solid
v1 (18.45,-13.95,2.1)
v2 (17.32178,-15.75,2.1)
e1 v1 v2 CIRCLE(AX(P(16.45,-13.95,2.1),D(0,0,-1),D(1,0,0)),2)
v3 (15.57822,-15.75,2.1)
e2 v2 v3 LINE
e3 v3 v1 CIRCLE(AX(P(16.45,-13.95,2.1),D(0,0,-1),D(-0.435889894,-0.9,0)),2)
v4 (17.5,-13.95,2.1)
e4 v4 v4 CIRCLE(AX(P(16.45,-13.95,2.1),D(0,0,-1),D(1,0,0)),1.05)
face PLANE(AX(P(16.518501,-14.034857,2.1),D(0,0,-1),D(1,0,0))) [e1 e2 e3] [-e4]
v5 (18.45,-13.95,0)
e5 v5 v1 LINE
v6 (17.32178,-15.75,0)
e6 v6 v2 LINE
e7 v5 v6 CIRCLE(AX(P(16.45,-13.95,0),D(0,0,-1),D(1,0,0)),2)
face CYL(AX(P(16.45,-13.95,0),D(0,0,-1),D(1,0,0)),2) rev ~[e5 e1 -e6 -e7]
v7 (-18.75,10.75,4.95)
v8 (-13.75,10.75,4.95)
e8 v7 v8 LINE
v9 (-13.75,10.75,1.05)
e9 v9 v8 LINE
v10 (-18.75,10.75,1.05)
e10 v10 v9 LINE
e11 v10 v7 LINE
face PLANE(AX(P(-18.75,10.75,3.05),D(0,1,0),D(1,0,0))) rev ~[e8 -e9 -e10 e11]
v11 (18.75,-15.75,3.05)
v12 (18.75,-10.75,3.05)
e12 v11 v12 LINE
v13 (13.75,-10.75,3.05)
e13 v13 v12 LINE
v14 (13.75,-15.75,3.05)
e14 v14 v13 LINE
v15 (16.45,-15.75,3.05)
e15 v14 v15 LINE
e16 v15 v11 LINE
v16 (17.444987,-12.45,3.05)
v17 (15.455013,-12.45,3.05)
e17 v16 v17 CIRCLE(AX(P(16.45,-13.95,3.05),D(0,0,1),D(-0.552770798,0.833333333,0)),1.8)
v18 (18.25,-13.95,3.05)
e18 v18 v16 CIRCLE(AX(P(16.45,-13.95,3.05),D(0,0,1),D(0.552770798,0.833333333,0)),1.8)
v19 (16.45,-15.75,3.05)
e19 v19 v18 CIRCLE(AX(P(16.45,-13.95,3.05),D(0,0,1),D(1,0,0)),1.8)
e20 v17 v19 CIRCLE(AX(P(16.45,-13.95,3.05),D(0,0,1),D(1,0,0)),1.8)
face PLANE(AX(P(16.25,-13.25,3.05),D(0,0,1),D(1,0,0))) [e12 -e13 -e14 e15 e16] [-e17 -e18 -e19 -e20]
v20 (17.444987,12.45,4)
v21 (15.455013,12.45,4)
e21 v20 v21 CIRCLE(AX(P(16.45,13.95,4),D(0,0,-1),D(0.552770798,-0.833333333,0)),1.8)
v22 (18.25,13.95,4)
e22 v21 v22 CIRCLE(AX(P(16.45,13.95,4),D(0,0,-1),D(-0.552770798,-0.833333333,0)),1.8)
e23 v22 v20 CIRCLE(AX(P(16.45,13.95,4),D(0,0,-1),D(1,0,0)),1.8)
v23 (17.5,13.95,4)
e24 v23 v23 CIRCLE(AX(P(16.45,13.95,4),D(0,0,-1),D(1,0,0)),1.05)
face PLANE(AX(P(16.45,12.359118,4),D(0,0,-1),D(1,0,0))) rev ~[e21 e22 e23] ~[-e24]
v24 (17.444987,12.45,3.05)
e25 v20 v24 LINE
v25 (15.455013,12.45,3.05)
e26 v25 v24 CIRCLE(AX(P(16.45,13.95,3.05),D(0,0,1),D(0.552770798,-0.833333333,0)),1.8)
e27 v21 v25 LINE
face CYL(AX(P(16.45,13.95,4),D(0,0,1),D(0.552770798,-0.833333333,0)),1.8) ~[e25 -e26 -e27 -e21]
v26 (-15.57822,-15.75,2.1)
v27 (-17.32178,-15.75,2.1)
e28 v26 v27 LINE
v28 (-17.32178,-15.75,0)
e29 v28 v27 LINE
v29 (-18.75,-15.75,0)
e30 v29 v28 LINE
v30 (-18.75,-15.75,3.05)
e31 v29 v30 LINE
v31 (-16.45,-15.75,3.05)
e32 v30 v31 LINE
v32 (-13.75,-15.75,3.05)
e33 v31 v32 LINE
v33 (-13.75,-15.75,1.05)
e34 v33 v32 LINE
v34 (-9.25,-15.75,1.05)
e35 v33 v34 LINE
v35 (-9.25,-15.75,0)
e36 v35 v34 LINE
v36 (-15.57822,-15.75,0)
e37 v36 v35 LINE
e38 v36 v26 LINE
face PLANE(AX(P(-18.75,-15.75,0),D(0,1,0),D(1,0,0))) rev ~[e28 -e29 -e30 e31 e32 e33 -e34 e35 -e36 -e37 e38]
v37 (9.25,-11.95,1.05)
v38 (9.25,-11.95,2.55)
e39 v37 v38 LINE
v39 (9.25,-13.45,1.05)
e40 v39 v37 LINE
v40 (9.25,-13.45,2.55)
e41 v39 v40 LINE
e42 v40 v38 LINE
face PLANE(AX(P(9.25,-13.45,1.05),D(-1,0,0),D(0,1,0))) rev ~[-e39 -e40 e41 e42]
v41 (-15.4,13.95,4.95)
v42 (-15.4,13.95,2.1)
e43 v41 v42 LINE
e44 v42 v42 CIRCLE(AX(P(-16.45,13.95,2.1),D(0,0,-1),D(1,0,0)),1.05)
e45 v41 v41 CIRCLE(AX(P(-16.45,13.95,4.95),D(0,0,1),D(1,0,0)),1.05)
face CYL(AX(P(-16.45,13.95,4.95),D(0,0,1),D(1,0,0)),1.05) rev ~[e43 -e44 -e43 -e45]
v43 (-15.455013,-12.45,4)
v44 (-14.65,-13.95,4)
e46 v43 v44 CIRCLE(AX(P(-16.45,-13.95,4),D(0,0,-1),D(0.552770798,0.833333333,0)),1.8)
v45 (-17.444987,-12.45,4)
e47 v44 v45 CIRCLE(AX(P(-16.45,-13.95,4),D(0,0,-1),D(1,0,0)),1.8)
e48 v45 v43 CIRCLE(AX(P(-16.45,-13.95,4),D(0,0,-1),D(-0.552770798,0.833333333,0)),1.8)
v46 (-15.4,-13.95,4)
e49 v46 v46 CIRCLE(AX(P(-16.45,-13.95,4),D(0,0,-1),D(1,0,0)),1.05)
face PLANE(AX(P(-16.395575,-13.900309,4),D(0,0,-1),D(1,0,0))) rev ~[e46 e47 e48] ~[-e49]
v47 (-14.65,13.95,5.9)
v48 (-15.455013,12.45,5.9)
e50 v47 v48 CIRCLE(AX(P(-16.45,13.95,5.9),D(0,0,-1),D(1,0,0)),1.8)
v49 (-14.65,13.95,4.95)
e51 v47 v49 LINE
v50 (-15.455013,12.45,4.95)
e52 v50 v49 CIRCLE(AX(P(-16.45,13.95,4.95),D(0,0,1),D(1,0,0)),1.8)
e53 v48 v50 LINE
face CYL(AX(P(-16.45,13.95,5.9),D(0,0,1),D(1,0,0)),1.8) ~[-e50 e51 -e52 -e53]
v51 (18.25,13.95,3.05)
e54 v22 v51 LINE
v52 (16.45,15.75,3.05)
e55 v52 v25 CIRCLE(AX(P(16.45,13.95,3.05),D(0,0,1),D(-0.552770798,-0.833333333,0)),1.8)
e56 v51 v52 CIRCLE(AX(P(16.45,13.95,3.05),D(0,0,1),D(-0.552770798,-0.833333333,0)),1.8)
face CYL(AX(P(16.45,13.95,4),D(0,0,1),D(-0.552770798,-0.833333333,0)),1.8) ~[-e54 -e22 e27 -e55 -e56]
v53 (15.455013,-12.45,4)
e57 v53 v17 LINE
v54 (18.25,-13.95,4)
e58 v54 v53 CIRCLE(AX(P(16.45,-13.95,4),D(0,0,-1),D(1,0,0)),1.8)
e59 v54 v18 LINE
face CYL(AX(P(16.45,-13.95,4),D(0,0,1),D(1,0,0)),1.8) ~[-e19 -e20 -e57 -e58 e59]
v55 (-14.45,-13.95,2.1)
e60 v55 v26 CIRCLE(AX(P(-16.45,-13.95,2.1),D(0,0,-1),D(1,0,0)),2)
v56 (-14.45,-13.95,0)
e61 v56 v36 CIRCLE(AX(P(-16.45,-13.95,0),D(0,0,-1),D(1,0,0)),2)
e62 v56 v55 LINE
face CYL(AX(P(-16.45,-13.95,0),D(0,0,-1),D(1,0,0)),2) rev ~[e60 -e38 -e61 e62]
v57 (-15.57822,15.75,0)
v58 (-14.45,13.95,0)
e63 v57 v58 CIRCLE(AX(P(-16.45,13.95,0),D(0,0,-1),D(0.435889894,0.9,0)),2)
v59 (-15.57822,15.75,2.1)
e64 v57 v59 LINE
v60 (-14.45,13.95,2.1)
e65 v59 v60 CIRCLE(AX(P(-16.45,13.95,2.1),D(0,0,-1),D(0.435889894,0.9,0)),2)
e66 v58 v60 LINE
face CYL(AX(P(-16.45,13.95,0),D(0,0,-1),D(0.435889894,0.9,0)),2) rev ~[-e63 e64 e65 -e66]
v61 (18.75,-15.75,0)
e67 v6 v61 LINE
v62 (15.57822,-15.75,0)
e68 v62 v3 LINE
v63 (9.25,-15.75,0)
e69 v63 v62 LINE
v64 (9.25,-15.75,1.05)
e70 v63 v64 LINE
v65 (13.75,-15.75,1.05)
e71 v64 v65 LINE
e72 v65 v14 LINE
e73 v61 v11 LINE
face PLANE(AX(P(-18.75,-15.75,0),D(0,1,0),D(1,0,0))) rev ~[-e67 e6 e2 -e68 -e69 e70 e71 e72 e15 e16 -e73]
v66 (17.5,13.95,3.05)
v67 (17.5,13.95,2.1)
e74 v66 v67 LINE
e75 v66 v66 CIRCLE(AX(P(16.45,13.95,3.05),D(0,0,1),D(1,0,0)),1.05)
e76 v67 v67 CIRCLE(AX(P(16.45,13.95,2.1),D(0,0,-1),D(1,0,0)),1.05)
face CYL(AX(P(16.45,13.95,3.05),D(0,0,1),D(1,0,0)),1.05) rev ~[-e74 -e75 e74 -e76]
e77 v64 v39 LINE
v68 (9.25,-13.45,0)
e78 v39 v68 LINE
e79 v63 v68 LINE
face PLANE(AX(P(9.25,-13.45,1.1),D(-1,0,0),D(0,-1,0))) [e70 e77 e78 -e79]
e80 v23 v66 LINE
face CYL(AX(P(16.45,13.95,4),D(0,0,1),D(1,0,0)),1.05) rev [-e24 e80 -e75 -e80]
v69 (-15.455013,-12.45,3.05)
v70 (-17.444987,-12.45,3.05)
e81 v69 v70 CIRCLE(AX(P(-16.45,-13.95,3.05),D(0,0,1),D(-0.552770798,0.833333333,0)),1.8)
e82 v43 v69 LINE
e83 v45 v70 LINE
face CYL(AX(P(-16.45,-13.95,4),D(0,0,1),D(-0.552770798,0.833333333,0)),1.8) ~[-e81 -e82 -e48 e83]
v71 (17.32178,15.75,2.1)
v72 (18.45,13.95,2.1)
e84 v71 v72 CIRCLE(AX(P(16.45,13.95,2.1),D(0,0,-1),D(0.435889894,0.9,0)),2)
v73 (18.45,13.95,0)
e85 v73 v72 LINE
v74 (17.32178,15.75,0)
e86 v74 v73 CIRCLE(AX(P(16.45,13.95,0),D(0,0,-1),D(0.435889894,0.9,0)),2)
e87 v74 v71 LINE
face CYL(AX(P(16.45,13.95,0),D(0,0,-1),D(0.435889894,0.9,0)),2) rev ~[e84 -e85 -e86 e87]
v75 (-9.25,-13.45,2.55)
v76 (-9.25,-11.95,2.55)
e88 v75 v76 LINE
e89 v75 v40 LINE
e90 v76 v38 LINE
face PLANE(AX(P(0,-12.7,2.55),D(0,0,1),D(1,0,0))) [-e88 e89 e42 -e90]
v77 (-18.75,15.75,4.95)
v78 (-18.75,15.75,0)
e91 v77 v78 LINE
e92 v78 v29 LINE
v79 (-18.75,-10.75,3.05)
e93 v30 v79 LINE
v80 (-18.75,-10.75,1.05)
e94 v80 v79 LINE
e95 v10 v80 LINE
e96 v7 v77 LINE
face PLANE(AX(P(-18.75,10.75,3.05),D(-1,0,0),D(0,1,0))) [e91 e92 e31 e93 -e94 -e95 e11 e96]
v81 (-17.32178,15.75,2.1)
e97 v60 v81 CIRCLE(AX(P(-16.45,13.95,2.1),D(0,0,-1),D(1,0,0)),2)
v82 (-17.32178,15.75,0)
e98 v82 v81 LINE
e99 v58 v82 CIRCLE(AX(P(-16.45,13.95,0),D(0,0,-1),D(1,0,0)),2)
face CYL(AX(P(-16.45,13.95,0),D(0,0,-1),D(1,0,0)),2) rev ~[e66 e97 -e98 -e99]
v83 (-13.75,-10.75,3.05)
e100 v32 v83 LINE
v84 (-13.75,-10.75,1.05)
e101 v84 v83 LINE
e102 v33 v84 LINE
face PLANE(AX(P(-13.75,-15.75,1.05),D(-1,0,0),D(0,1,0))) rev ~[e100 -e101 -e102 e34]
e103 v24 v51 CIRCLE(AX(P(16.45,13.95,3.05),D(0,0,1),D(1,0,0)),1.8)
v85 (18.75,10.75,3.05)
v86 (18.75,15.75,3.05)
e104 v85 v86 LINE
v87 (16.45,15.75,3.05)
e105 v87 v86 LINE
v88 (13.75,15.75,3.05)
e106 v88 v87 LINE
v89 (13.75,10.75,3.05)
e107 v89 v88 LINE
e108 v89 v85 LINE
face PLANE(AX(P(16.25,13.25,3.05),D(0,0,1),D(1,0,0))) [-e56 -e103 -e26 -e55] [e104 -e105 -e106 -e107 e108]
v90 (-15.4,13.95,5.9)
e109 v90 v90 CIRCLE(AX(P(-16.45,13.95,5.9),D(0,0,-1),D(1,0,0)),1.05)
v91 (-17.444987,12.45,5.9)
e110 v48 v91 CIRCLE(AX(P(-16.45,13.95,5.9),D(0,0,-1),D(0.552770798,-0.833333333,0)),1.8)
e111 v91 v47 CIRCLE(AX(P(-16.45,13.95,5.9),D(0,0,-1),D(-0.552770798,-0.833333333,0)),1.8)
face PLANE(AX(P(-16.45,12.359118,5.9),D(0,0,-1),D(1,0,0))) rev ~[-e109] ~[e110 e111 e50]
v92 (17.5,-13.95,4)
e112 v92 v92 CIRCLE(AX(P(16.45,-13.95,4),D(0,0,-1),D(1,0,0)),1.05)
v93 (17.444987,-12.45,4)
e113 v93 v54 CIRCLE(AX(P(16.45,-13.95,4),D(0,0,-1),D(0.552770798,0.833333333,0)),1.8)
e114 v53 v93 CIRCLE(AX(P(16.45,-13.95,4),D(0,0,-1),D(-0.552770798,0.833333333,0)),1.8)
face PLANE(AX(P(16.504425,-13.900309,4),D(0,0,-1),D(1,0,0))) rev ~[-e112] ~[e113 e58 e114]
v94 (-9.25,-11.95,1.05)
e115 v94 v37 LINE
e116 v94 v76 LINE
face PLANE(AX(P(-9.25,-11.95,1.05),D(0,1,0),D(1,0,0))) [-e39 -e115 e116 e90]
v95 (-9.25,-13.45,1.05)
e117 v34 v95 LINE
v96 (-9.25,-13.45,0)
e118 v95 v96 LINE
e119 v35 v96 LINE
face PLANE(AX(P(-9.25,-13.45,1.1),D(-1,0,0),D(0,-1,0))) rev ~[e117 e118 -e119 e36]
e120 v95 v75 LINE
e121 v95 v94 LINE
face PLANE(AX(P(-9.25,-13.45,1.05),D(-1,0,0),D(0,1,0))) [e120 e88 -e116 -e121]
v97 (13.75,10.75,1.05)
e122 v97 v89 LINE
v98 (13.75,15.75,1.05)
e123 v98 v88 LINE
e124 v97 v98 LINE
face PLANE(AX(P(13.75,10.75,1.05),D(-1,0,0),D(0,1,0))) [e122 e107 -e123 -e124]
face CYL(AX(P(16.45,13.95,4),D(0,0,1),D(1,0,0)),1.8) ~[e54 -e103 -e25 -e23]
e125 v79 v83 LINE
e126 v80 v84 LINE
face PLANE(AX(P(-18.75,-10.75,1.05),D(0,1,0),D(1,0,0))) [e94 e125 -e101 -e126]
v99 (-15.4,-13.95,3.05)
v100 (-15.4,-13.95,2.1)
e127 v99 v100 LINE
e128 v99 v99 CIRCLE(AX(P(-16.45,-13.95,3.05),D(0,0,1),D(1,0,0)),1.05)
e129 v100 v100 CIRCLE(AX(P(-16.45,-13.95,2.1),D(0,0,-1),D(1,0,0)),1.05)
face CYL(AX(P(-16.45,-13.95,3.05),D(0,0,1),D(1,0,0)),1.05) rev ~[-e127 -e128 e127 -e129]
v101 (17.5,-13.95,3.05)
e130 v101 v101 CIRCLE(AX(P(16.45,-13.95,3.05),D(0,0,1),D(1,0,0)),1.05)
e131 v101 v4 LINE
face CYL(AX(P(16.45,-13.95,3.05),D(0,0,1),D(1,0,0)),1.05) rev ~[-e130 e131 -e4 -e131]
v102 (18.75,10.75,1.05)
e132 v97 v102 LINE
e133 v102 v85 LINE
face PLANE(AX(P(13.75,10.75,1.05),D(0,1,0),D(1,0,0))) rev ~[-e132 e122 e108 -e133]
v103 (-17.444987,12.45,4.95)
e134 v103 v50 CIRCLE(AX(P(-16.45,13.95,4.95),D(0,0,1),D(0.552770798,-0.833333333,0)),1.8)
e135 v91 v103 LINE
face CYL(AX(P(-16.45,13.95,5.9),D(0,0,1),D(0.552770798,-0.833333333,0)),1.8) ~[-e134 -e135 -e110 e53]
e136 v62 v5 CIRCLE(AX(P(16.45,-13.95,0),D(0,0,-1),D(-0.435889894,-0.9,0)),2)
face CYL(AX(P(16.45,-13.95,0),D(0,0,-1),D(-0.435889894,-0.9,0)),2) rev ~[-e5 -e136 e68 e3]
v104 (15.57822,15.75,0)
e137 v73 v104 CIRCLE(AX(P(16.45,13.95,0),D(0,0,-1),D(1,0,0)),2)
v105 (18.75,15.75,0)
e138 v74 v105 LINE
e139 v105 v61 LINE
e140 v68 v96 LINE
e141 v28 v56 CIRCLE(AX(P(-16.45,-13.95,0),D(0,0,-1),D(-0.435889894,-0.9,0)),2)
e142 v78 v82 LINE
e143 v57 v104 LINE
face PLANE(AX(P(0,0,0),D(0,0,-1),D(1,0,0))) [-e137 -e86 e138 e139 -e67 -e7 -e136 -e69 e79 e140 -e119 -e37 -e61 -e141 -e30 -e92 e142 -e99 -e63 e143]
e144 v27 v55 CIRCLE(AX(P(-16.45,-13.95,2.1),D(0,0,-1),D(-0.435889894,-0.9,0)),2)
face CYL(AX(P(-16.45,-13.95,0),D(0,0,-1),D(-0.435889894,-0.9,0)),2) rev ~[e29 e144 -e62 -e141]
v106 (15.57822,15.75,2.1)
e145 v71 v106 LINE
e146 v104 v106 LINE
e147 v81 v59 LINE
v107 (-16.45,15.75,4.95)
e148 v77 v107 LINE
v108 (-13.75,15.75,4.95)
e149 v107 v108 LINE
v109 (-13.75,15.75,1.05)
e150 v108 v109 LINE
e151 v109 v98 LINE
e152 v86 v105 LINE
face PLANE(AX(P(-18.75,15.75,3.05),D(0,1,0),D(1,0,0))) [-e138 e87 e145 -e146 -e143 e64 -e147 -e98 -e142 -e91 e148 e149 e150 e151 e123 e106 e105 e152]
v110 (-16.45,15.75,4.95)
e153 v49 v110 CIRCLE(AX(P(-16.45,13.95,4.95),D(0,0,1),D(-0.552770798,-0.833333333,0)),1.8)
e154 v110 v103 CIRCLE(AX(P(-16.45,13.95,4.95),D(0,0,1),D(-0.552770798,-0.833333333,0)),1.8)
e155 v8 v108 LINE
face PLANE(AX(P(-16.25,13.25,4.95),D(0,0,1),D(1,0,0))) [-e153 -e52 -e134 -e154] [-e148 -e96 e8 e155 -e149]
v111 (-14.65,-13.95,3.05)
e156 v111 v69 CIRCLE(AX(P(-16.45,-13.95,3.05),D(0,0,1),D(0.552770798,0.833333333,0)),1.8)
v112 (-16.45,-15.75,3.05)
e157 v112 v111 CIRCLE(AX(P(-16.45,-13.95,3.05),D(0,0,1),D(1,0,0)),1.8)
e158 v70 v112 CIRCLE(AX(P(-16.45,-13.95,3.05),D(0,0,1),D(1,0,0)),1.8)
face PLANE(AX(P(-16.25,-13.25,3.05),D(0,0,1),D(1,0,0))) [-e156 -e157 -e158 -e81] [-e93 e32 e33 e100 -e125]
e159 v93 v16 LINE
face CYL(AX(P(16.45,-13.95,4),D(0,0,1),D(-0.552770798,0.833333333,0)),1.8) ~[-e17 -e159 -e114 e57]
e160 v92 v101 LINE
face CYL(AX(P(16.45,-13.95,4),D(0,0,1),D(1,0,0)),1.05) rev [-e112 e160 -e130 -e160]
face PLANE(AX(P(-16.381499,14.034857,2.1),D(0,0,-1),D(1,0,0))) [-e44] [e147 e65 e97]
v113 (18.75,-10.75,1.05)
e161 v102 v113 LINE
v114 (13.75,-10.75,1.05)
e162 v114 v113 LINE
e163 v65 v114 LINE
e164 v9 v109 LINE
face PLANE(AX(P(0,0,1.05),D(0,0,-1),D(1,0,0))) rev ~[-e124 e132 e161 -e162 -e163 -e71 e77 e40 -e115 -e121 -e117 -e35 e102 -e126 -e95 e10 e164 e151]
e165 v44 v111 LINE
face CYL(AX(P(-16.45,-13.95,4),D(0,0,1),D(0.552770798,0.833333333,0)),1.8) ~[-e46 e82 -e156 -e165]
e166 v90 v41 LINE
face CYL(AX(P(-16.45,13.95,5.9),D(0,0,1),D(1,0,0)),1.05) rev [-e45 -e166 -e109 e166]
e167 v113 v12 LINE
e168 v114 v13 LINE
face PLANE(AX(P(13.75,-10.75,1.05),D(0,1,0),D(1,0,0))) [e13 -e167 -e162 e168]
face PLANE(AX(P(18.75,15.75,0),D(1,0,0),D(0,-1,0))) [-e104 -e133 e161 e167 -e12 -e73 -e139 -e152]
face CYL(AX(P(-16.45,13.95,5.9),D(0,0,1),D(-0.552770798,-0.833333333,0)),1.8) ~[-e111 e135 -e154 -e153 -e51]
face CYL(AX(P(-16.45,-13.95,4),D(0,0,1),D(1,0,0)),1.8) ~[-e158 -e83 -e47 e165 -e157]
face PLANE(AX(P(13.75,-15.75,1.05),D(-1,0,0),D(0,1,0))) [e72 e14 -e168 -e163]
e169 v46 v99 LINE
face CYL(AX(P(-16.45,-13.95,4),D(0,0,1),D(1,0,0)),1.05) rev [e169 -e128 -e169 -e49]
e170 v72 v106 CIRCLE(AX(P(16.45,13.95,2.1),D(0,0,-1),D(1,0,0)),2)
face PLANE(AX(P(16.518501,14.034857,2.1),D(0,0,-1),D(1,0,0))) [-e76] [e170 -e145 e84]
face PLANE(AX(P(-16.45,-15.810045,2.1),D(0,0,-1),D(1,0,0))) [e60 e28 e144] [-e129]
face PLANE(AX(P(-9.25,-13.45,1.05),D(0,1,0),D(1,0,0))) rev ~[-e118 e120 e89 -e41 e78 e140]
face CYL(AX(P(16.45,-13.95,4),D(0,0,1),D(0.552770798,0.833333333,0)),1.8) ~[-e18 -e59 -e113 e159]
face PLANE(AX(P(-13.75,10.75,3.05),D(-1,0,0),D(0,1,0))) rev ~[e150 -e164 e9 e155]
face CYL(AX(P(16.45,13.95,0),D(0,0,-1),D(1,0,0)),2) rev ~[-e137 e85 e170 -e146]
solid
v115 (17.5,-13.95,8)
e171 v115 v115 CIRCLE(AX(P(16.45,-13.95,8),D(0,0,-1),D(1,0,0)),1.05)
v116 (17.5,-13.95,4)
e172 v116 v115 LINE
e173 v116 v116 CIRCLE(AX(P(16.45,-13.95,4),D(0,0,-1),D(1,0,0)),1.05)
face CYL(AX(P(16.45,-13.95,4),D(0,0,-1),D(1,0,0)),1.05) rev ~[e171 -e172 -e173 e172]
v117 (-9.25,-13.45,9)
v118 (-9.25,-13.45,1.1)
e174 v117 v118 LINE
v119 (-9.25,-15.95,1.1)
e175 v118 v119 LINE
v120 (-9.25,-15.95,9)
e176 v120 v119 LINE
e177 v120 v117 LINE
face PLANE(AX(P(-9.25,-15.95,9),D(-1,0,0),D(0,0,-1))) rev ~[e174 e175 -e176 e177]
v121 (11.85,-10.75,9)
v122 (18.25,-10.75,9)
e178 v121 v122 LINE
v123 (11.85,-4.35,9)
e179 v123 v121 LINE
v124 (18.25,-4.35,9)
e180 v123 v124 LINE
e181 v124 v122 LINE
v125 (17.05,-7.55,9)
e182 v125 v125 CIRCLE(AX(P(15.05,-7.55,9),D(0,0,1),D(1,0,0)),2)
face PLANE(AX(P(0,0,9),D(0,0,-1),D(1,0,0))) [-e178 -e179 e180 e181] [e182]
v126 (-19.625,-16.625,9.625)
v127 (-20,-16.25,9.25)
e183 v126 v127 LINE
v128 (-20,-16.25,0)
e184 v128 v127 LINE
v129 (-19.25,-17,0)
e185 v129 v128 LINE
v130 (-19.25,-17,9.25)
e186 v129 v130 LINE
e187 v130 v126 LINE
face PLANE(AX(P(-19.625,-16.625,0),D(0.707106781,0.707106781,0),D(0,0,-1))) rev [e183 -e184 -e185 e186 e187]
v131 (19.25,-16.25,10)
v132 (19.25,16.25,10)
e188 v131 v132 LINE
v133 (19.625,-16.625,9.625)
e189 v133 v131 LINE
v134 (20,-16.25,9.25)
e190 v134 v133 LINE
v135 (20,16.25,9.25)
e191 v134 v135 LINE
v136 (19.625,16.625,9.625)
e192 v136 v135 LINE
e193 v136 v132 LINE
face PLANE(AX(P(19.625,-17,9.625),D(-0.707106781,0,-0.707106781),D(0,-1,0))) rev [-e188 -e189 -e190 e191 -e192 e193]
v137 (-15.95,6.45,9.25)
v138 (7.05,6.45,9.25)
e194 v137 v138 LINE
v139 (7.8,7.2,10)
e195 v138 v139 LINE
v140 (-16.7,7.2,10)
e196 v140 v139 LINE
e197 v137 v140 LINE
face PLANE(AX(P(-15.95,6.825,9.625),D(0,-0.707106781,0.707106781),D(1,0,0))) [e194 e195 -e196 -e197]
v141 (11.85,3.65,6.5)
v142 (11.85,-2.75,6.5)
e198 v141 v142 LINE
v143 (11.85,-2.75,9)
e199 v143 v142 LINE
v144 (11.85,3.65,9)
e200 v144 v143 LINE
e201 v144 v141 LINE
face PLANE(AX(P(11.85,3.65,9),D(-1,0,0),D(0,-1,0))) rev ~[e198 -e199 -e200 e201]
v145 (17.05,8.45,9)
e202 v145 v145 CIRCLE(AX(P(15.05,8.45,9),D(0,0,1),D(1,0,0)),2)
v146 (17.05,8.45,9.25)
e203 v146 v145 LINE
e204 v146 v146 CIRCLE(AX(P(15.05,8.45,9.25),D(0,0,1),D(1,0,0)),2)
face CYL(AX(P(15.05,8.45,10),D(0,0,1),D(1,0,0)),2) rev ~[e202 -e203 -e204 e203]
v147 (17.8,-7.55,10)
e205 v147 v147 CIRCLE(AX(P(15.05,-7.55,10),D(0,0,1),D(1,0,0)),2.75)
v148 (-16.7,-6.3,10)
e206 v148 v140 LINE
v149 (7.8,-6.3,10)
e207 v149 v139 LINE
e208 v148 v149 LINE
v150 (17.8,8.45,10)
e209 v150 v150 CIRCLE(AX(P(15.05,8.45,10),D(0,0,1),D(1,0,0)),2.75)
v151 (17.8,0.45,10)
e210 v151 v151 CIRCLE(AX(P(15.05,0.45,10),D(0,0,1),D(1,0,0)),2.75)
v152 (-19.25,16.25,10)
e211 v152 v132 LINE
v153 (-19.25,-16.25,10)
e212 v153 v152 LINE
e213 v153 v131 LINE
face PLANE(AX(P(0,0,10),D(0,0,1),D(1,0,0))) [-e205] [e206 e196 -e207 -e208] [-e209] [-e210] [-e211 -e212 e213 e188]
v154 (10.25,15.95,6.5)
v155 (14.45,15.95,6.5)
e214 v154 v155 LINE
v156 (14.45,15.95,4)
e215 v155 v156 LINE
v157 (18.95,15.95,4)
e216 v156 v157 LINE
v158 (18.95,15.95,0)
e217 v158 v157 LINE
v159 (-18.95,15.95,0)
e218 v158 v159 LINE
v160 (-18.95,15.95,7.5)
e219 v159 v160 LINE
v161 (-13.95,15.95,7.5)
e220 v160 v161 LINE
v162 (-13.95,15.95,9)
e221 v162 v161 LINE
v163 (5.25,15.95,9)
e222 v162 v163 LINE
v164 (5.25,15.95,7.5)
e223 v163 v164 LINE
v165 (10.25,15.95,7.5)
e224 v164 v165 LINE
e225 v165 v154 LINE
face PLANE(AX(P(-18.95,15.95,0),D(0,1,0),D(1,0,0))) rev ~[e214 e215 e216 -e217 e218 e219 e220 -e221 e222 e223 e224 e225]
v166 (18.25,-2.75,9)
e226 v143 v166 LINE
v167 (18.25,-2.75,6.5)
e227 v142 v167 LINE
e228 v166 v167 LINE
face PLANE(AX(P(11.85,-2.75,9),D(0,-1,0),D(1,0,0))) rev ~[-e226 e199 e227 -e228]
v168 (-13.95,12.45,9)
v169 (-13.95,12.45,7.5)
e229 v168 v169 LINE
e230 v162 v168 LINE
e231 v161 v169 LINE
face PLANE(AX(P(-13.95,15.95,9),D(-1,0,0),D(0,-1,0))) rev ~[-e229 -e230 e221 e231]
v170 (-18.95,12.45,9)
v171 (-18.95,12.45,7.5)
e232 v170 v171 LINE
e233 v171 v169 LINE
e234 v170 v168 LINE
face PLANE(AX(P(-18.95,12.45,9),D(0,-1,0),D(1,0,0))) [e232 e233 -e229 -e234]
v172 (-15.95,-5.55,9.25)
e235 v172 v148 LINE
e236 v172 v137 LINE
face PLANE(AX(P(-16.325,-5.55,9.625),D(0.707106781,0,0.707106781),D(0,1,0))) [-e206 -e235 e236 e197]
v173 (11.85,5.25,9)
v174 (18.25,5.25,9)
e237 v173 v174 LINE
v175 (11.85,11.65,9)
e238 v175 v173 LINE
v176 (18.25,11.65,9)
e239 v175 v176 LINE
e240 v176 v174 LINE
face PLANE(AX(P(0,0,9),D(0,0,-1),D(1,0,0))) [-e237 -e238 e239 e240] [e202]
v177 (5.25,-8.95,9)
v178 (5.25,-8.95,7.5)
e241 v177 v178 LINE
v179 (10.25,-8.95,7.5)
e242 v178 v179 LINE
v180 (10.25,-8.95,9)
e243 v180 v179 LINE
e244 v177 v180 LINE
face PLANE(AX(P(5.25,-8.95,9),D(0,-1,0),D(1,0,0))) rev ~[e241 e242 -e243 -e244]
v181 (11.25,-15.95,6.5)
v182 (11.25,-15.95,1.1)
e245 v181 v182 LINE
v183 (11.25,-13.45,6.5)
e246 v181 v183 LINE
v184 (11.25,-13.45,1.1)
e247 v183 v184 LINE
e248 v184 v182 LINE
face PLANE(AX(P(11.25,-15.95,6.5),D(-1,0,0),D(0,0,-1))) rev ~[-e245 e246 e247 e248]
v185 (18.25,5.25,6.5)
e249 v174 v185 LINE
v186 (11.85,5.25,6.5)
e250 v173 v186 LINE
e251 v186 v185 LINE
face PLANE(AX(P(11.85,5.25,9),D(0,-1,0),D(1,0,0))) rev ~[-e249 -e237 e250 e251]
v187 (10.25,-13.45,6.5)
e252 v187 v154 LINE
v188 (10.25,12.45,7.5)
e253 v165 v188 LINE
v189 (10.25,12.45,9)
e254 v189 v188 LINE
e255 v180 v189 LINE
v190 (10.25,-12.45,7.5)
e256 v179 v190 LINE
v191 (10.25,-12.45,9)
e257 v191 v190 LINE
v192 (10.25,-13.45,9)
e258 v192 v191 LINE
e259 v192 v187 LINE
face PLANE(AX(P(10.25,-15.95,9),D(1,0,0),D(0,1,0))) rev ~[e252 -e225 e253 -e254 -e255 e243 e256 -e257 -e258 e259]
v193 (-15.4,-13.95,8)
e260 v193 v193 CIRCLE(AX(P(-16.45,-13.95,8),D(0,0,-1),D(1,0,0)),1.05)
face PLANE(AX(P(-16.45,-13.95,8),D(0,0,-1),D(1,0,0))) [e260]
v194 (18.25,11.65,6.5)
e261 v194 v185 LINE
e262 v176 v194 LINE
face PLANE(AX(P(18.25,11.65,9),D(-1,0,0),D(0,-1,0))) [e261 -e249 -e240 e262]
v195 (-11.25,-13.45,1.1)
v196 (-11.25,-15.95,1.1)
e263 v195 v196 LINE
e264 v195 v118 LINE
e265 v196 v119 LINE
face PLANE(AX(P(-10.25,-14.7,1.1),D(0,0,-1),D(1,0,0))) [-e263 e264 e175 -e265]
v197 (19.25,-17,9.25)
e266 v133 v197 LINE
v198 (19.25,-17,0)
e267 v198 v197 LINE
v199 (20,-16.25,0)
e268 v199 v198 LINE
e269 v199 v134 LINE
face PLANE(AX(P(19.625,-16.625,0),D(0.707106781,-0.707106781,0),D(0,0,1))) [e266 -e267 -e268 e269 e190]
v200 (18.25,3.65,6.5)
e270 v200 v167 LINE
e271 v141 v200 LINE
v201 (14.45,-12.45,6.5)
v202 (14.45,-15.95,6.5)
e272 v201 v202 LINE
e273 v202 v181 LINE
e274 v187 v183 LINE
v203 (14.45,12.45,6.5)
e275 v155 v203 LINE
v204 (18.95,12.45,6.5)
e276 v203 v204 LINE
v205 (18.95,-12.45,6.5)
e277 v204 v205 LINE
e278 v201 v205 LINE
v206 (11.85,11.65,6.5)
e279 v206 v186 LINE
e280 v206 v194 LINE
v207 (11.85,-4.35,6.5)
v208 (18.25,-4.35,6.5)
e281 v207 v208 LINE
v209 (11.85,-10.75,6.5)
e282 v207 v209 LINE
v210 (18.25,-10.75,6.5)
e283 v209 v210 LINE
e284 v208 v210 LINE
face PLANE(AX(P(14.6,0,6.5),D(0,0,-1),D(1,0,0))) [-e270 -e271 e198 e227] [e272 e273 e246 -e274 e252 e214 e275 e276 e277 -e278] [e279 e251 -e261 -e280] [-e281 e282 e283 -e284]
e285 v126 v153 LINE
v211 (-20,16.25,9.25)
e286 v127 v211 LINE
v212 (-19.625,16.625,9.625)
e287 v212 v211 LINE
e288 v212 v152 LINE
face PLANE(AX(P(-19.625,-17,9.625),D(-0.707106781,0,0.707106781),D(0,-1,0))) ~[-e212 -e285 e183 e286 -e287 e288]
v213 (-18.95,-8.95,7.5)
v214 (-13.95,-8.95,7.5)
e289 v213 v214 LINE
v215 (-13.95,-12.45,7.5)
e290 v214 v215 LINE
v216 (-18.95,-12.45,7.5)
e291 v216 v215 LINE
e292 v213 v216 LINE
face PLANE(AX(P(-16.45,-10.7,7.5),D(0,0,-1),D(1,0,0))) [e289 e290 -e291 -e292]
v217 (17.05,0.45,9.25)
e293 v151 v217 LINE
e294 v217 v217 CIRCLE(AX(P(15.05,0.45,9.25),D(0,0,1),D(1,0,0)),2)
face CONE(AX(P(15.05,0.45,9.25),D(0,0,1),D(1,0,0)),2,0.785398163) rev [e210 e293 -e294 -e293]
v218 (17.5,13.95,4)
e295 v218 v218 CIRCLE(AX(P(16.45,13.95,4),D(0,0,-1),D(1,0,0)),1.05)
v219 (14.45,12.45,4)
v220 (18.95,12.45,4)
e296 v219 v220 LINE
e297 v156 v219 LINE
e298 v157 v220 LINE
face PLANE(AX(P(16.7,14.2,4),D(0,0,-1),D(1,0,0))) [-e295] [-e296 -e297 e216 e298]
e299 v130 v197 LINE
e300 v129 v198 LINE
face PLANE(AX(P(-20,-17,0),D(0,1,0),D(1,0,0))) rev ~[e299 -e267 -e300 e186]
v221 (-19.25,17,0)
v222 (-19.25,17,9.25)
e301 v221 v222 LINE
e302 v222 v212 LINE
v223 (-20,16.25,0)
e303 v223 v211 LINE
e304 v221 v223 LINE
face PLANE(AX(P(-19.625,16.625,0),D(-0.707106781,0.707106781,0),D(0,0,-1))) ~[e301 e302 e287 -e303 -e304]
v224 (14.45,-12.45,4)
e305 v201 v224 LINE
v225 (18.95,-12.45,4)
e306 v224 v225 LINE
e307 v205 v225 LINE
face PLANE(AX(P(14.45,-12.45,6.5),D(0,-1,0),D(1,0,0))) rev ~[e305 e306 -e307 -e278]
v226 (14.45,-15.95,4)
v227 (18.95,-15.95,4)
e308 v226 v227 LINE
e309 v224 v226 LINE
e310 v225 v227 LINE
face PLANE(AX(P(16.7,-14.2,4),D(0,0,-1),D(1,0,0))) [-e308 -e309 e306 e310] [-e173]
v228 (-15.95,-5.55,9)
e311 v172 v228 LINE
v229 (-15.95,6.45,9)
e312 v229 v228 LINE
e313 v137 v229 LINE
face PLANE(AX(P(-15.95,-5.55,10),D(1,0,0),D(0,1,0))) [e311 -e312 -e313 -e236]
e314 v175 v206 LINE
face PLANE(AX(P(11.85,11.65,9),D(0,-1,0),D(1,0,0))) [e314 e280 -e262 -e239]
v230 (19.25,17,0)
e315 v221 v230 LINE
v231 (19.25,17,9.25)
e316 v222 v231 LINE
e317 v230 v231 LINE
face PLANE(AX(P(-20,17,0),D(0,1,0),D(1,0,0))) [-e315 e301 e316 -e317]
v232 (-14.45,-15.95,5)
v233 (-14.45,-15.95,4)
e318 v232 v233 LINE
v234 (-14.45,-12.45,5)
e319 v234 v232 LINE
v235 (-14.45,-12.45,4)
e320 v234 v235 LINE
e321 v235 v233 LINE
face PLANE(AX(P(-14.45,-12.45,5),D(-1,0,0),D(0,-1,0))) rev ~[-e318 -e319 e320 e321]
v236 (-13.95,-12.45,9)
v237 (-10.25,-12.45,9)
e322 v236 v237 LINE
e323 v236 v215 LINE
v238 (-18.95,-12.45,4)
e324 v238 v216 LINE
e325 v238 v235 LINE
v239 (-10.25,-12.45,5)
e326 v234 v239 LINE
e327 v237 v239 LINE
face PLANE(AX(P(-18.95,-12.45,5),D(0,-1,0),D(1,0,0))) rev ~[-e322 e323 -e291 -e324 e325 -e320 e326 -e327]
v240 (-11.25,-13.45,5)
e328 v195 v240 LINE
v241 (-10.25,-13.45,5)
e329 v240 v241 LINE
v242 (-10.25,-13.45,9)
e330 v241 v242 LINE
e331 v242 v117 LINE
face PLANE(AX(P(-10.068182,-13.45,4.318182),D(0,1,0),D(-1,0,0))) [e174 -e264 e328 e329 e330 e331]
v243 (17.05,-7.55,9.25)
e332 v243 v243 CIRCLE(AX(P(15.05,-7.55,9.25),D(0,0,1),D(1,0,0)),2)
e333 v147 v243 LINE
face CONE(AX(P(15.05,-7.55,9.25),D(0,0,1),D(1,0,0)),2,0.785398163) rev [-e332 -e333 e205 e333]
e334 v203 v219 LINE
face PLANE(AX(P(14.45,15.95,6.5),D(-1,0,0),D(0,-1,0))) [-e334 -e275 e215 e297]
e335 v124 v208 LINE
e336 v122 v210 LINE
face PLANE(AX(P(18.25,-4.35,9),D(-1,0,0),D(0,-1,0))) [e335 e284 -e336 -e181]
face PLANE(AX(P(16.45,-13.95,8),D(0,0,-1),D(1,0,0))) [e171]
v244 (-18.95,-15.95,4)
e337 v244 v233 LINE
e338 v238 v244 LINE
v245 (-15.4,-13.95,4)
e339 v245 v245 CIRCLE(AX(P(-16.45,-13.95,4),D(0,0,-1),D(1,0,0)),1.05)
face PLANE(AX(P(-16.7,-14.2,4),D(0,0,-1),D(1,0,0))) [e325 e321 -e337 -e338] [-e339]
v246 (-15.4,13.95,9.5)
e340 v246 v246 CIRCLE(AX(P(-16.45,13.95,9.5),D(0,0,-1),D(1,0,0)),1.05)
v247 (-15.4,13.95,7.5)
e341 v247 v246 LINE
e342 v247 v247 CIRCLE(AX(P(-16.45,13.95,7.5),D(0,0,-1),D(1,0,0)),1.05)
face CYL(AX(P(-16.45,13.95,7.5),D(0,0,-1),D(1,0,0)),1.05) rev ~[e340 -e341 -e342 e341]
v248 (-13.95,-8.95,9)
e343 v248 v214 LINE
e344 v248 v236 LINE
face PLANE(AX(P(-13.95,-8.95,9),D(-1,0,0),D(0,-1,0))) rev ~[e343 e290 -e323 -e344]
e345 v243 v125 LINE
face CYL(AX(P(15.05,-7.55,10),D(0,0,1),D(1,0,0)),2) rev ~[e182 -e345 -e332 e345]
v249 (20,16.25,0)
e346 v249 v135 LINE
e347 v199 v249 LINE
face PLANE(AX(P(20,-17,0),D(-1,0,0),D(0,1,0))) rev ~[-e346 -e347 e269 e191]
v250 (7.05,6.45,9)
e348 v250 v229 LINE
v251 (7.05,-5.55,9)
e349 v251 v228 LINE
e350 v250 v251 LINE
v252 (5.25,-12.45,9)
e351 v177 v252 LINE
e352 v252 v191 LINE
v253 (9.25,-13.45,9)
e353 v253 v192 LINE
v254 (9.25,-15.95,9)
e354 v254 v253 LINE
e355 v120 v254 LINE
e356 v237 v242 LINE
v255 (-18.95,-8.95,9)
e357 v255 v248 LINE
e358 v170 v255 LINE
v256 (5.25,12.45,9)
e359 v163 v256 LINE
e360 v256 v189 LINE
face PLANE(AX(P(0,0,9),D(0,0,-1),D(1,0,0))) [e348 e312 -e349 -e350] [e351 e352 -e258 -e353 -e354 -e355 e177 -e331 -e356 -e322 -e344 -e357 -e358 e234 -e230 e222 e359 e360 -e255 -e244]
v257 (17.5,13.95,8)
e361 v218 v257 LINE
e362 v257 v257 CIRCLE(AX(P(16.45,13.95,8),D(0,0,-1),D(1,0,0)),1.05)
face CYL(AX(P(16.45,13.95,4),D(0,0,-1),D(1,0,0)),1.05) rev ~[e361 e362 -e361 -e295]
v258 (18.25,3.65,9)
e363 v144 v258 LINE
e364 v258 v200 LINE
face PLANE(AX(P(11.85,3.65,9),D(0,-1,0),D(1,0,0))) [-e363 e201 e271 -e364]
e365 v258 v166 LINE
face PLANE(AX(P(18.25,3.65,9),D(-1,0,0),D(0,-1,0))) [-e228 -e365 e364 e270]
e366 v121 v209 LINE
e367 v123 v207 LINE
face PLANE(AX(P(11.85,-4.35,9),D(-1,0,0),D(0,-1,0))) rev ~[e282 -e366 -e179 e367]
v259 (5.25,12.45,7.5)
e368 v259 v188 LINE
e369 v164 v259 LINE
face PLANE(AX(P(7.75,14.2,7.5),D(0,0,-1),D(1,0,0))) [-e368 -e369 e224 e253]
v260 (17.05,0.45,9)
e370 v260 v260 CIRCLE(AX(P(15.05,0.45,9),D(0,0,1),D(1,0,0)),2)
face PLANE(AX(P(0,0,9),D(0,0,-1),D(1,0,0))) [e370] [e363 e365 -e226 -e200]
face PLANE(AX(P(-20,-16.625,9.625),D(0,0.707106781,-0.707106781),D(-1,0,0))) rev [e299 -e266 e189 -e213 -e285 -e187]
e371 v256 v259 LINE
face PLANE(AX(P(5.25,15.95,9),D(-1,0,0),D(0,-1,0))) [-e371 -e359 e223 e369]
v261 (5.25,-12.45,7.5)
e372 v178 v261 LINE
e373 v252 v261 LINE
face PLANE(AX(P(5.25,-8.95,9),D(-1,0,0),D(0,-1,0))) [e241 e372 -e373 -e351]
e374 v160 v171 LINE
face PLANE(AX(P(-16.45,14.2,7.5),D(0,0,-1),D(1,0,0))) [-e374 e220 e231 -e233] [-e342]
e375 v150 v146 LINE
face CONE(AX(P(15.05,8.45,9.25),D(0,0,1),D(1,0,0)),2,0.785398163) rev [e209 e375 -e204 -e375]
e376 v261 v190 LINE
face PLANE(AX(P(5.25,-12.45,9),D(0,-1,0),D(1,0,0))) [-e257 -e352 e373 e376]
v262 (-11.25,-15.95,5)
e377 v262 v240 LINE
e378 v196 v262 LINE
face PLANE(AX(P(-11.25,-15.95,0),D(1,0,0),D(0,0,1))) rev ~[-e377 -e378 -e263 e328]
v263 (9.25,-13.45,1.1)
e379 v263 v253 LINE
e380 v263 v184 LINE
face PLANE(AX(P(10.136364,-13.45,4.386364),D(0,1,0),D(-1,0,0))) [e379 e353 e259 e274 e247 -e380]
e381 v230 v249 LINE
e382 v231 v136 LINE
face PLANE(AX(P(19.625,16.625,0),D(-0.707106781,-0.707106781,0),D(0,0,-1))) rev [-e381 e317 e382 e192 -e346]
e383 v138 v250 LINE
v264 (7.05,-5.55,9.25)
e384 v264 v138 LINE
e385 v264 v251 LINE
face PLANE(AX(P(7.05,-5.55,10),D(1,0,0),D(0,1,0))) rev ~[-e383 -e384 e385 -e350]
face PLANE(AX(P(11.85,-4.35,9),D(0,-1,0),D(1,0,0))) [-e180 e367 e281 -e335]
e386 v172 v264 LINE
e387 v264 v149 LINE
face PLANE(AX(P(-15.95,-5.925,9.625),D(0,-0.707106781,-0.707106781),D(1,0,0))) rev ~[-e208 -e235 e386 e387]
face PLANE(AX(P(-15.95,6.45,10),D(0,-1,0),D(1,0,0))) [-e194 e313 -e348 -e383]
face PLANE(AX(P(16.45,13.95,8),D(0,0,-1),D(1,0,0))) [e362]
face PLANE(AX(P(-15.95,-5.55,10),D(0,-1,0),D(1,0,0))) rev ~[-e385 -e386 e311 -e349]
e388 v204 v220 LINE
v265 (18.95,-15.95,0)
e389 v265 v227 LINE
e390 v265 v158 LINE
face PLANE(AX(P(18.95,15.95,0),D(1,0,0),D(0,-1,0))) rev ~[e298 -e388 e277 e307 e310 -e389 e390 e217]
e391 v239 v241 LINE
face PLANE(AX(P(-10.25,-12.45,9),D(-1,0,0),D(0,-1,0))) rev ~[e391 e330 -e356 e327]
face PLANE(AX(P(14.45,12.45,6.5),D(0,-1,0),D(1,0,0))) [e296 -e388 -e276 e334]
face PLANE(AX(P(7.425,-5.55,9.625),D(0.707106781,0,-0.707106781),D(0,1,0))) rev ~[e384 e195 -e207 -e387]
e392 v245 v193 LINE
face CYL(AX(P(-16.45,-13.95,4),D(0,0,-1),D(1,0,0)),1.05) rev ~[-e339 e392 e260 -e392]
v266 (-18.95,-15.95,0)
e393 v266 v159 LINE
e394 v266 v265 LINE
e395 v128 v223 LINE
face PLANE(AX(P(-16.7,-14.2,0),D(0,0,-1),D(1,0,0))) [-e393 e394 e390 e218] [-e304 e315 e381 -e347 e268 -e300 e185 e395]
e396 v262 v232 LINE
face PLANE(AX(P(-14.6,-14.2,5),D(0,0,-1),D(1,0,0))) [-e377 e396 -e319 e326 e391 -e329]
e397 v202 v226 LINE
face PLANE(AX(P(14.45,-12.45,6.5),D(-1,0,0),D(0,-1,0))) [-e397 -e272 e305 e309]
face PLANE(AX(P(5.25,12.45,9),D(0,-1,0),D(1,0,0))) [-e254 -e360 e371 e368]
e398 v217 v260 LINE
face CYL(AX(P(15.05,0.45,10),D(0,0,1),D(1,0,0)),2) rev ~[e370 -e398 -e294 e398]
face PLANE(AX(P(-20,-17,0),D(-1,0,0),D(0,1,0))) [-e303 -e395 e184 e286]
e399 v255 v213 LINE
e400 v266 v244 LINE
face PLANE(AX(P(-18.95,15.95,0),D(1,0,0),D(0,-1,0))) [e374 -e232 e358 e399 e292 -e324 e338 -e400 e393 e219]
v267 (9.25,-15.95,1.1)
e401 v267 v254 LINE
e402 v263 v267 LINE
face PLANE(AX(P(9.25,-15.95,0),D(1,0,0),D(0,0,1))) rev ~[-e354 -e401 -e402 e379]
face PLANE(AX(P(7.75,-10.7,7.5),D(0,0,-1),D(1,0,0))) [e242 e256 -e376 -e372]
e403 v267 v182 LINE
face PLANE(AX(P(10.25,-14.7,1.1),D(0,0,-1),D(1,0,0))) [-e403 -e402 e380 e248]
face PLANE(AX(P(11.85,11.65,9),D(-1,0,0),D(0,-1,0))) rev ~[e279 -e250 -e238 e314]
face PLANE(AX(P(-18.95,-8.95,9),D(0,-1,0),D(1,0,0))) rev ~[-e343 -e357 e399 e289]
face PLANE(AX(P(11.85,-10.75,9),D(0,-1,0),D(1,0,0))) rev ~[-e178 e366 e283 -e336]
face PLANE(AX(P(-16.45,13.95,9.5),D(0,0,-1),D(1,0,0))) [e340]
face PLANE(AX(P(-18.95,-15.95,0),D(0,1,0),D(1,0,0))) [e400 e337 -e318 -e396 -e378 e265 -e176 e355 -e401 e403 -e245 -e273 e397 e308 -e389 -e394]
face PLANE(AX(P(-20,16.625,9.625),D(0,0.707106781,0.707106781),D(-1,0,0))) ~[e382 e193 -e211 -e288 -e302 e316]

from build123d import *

# Parameters (mm, degrees)
F0_W      = 40
F0_H      = 34
F1_DEPTH  = 10
F2_W      = 37.9
F2_H      = 31.9
F3_DEPTH  = 9
F4_R      = 2
F4_W      = 23
F4_H      = 12
F5_DEPTH  = 25
F6_W      = 6.4
F6_H      = 6.4
F7_DEPTH  = 2.5
F6_W_2    = 5
F6_H_2    = 3.5
F8_DEPTH  = 1.5
F9_DEPTH  = 4
F10_R     = 1.05
F11_DEPTH = 2
F12_SIZE  = 0.75
F14_DEPTH = 2.5
F15_W     = 2
F15_H     = 2.5
F16_DEPTH = 1.1
F17_SIZE  = 0.75
F18_W     = 4.5
F18_H     = 3.5
F19_W     = 4.5
F19_H     = 3.5
F20_DEPTH = 5
F21_W     = 4.5
F21_H     = 3.5
F22_DEPTH = 4
F23_R     = 1.05
F24_R     = 1.05
F25_R     = 1.05
F26_DEPTH = 4
F27_W     = 37.5
F27_H     = 31.5
F28_DEPTH = 1.05
F29_W     = 18.5
F29_H     = 2.5
F30_DEPTH = 25
F32_R     = 1.05
F33_DEPTH = 2.95
F31_R     = 1.05
F34_DEPTH = 2.95
F35_R     = 1.05
F36_DEPTH = 2.95
F38_START = 1.6
F37_R     = 1.05
F38_DEPTH = 4.85
F39_W     = 5
F39_H     = 5
F40_DEPTH = 2
F41_W     = 5
F41_H     = 5
F42_DEPTH = 1.9
F43_DEPTH = 25
F44_R     = 1.05
F45_DEPTH = 2.1
F46_W     = 18.5
F46_H     = 1.5
F47_DEPTH = 1.5


with BuildPart() as f1:
    # F0 (on Top) → F1 (new body)
    with BuildSketch(Plane.XY):
        Rectangle(F0_W, F0_H)
    extrude(amount=F1_DEPTH)

    # F2 (on face) → F3 (cut)
    with BuildSketch(Plane(origin=(0, 0, 0), x_dir=(1, 0, 0), z_dir=(0, 0, -1))):
        Rectangle(F2_W, F2_H)
    extrude(amount=-F3_DEPTH, mode=Mode.SUBTRACT)

    # F4 (on face) → F5 (cut)
    with BuildSketch(Plane.XY.offset(10)):
        with Locations((15.05, -7.55)):
            Circle(F4_R)
        with Locations((15.05, 0.45)):
            Circle(F4_R)
        with Locations((15.05, 8.45)):
            Circle(F4_R)
        with Locations((-4.45, 0.45)):
            Rectangle(F4_W, F4_H)
    extrude(amount=-F5_DEPTH, mode=Mode.SUBTRACT)

    # F6 (on face) → F7 (join)
    with BuildSketch(Plane(origin=(0, 0, 9), x_dir=(1, 0, 0), z_dir=(0, 0, -1))):
        Polygon((18.95, 15.95), (10.25, 15.95), (10.25, 12.45), (10.25, 8.95), (10.25, -12.45), (10.25, -15.95), (18.95, -15.95), align=None)
        with Locations((15.05, -8.45)):
            Rectangle(F6_W, F6_H, mode=Mode.SUBTRACT)
        with Locations((15.05, -0.45)):
            Rectangle(F6_W, F6_H, mode=Mode.SUBTRACT)
        with Locations((15.05, 7.55)):
            Rectangle(F6_W, F6_H, mode=Mode.SUBTRACT)
    extrude(amount=F7_DEPTH)

    # F6 (on face) → F8 (join)
    with BuildSketch(Plane(origin=(0, 0, 9), x_dir=(1, 0, 0), z_dir=(0, 0, -1))):
        with Locations((-16.45, 10.7)):
            Rectangle(F6_W_2, F6_H_2)
        with Locations((7.75, 10.7)):
            Rectangle(F6_W_2, F6_H_2)
        with Locations((-16.45, -14.2)):
            Rectangle(F6_W_2, F6_H_2)
        with Locations((7.75, -14.2)):
            Rectangle(F6_W_2, F6_H_2)
    extrude(amount=F8_DEPTH)

    # F6 (on face) → F9 (join)
    with BuildSketch(Plane(origin=(0, 0, 9), x_dir=(1, 0, 0), z_dir=(0, 0, -1))):
        Polygon((-10.25, 12.45), (-10.25, 15.95), (-18.95, 15.95), (-18.95, 12.45), (-13.95, 12.45), align=None)
    extrude(amount=F9_DEPTH)

    # F10 (on face) → F11 (cut)
    with BuildSketch(Plane(origin=(0, 0, 7.5), x_dir=(1, 0, 0), z_dir=(0, 0, -1))):
        with Locations((-16.45, -13.95)):
            Circle(F10_R)
    extrude(amount=-F11_DEPTH, mode=Mode.SUBTRACT)

    # F12
    f12_edges = [f1.edges().sort_by_distance(p)[0] for p in [
        (-20, 0, 10),
        (0, 17, 10),
        (20, 0, 10),
        (0, -17, 10),
        (-4.45, 6.45, 10),
        (7.05, 0.45, 10),
        (-4.45, -5.55, 10),
        (-15.95, 0.45, 10),
        (13.05, 8.45, 10),
        (13.05, 0.45, 10),
        (13.05, -7.55, 10),
    ]]
    chamfer(f12_edges, length=F12_SIZE)

    # F13 (on face) → F14 (join)
    with BuildSketch(Plane(origin=(0, -15.95, 0), x_dir=(-1, 0, 0), z_dir=(0, 1, 0))):
        Polygon((9.25, 0), (11.25, 0), (11.25, 5), (10.25, 5), (10.25, 9), (9.25, 9), align=None)
        Polygon((-11.25, 0), (-9.25, 0), (-9.25, 9), (-10.25, 9), (-10.25, 6.5), (-11.25, 6.5), align=None)
    extrude(amount=F14_DEPTH)

    # F15 (on face) → F16 (cut)
    with BuildSketch(Plane(origin=(0, 0, 0), x_dir=(1, 0, 0), z_dir=(0, 0, -1))):
        with Locations((-10.25, 14.7)):
            Rectangle(F15_W, F15_H)
        with Locations((10.25, 14.7)):
            Rectangle(F15_W, F15_H)
    extrude(amount=-F16_DEPTH, mode=Mode.SUBTRACT)

    # F17
    f17_edges = [f1.edges().sort_by_distance(p)[0] for p in [
        (-20, 17, 4.625),
        (20, 17, 4.625),
        (-20, -17, 4.625),
        (20, -17, 4.625),
    ]]
    chamfer(f17_edges, length=F17_SIZE)

    # F18 (on face) + F19 (on face) → F20 (join, through all)
    with BuildSketch(Plane(origin=(0, 0, 5), x_dir=(1, 0, 0), z_dir=(0, 0, -1))):
        with Locations((-16.7, 14.2)):
            Rectangle(F18_W, F18_H)
    with BuildSketch(Plane(origin=(0, 0, 6.5), x_dir=(1, 0, 0), z_dir=(0, 0, -1))):
        with Locations((16.7, 14.2)):
            Rectangle(F19_W, F19_H)
        with Locations((16.7, -14.2)):
            Rectangle(F19_W, F19_H)
    extrude(amount=F20_DEPTH)

    # F21 (on face) → F22 (cut)
    with BuildSketch(Plane(origin=(0, 0, 0), x_dir=(1, 0, 0), z_dir=(0, 0, -1))):
        with Locations((-16.7, 14.2)):
            Rectangle(F21_W, F21_H)
        with Locations((16.7, 14.2)):
            Rectangle(F21_W, F21_H)
        with Locations((16.7, -14.2)):
            Rectangle(F21_W, F21_H)
    extrude(amount=-F22_DEPTH, mode=Mode.SUBTRACT)

    # F23 (on face) + F24 (on face) + F25 (on face) → F26 (cut)
    with BuildSketch(Plane(origin=(0, 0, 4), x_dir=(1, 0, 0), z_dir=(0, 0, -1))):
        with Locations((-16.45, 13.95)):
            Circle(F23_R)
    with BuildSketch(Plane(origin=(0, 0, 4), x_dir=(1, 0, 0), z_dir=(0, 0, -1))):
        with Locations((16.45, 13.95)):
            Circle(F24_R)
    with BuildSketch(Plane(origin=(0, 0, 4), x_dir=(1, 0, 0), z_dir=(0, 0, -1))):
        with Locations((16.45, -13.95)):
            Circle(F25_R)
    extrude(amount=-F26_DEPTH, mode=Mode.SUBTRACT)


with BuildPart() as f28:
    # F27 (on face) → F28 (new body)
    with BuildSketch(Plane(origin=(0, 0, 0), x_dir=(1, 0, 0), z_dir=(0, 0, -1))):
        Rectangle(F27_W, F27_H)
    extrude(amount=-F28_DEPTH)

    # F29 (on face) → F30 (cut)
    with BuildSketch(Plane(origin=(0, 0, 1.1), x_dir=(1, 0, 0), z_dir=(0, 0, -1))):
        with Locations((0, 14.7)):
            Rectangle(F29_W, F29_H)
    extrude(amount=F30_DEPTH, mode=Mode.SUBTRACT)

    # F32 (on face) → F33 (join, through all)
    with BuildSketch(Plane(origin=(0, 0, 4), x_dir=(1, 0, 0), z_dir=(0, 0, -1))):
        with BuildLine():
            ThreePointArc((17.4449874371, 12.45), (18.0360292221, 13.0988177007), (18.25, 13.95))
            ThreePointArc((18.25, 13.95), (15.5988177007, 15.5360292221), (15.4550125629, 12.45))
            Line((15.4550125629, 12.45), (17.4449874371, 12.45))
        make_face()
        with Locations((16.45, 13.95)):
            Circle(F32_R, mode=Mode.SUBTRACT)
        with BuildLine():
            Line((17.4449874371, 12.45), (15.4550125629, 12.45))
            ThreePointArc((15.4550125629, 12.45), (16.45, 12.15), (17.4449874371, 12.45))
        make_face()
    extrude(amount=F33_DEPTH)

    # F31 (on face) → F34 (join, through all)
    with BuildSketch(Plane(origin=(0, 0, 4), x_dir=(1, 0, 0), z_dir=(0, 0, -1))):
        with BuildLine():
            ThreePointArc((-15.4550125629, 12.45), (-14.8639707779, 13.0988177007), (-14.65, 13.95))
            ThreePointArc((-14.65, 13.95), (-17.3011822993, 15.5360292221), (-17.4449874371, 12.45))
            Line((-17.4449874371, 12.45), (-15.4550125629, 12.45))
        make_face()
        with Locations((-16.45, 13.95)):
            Circle(F31_R, mode=Mode.SUBTRACT)
        with BuildLine():
            Line((-15.4550125629, 12.45), (-17.4449874371, 12.45))
            ThreePointArc((-17.4449874371, 12.45), (-16.45, 12.15), (-15.4550125629, 12.45))
        make_face()
    extrude(amount=F34_DEPTH)

    # F35 (on face) → F36 (join, through all)
    with BuildSketch(Plane(origin=(0, 0, 4), x_dir=(1, 0, 0), z_dir=(0, 0, -1))):
        with BuildLine():
            Line((15.4550125629, -12.45), (17.4449874371, -12.45))
            ThreePointArc((17.4449874371, -12.45), (16.45, -12.15), (15.4550125629, -12.45))
        make_face()
        with BuildLine():
            ThreePointArc((15.4550125629, -12.45), (15.5988177007, -15.5360292221), (18.25, -13.95))
            ThreePointArc((18.25, -13.95), (18.0360292221, -13.0988177007), (17.4449874371, -12.45))
            Line((17.4449874371, -12.45), (15.4550125629, -12.45))
        make_face()
        with Locations((16.45, -13.95)):
            Circle(F35_R, mode=Mode.SUBTRACT)
    extrude(amount=F36_DEPTH)

    # F37 (on face) → F38 (join)
    with BuildSketch(Plane(origin=(0, 0, 7.5), x_dir=(1, 0, 0), z_dir=(0, 0, -1)).offset(F38_START)):
        with BuildLine():
            Line((-17.4449874371, -12.45), (-15.4550125629, -12.45))
            ThreePointArc((-15.4550125629, -12.45), (-16.45, -12.15), (-17.4449874371, -12.45))
        make_face()
        with BuildLine():
            ThreePointArc((-17.4449874371, -12.45), (-17.3011822993, -15.5360292221), (-14.65, -13.95))
            ThreePointArc((-14.65, -13.95), (-14.8639707779, -13.0988177007), (-15.4550125629, -12.45))
            Line((-15.4550125629, -12.45), (-17.4449874371, -12.45))
        make_face()
        with Locations((-16.45, -13.95)):
            Circle(F37_R, mode=Mode.SUBTRACT)
    extrude(amount=F38_DEPTH)

    # F39 (on face) → F40 (join)
    with BuildSketch(Plane.XY.offset(1.05)):
        with Locations((-16.25, 13.25)):
            Rectangle(F39_W, F39_H)
        with Locations((16.25, 13.25)):
            Rectangle(F39_W, F39_H)
        with Locations((16.25, -13.25)):
            Rectangle(F39_W, F39_H)
        with Locations((-16.25, -13.25)):
            Rectangle(F39_W, F39_H)
    extrude(amount=F40_DEPTH)

    # F41 (on face) → F42 (join)
    with BuildSketch(Plane.XY.offset(3.05)):
        with Locations((-16.25, 13.25)):
            Rectangle(F41_W, F41_H)
    extrude(amount=F42_DEPTH)

    # F43 (cut): faces of the model
    f43_faces = [f28.faces().sort_by_distance(p)[0] for p in [
        (16.45, -13.95, 3.05),
        (-16.45, -13.95, 3.05),
        (-16.45, 13.95, 4.95),
        (16.45, 13.95, 3.05),
    ]]
    extrude(f43_faces, amount=-F43_DEPTH, mode=Mode.SUBTRACT)

    # F44 (on face) → F45 (cut)
    with BuildSketch(Plane(origin=(0, 0, 0), x_dir=(1, 0, 0), z_dir=(0, 0, -1))):
        with BuildLine():
            ThreePointArc((15.5782202113, 15.75), (15.3878228908, 12.2553673588), (18.45, 13.95))
            ThreePointArc((18.45, 13.95), (18.1446326412, 15.0121771092), (17.3217797887, 15.75))
            Line((17.3217797887, 15.75), (15.5782202113, 15.75))
        make_face()
        with Locations((16.45, 13.95)):
            Circle(F44_R, mode=Mode.SUBTRACT)
        with BuildLine():
            Line((15.5782202113, -15.75), (17.3217797887, -15.75))
            ThreePointArc((17.3217797887, -15.75), (18.1446326412, -15.0121771092), (18.45, -13.95))
            ThreePointArc((18.45, -13.95), (15.3878228908, -12.2553673588), (15.5782202113, -15.75))
        make_face()
        with Locations((16.45, -13.95)):
            Circle(F44_R, mode=Mode.SUBTRACT)
        with BuildLine():
            ThreePointArc((15.5782202113, -15.75), (16.45, -15.95), (17.3217797887, -15.75))
            Line((17.3217797887, -15.75), (15.5782202113, -15.75))
        make_face()
        with BuildLine():
            Line((-17.3217797887, -15.75), (-15.5782202113, -15.75))
            ThreePointArc((-15.5782202113, -15.75), (-14.7553673588, -15.0121771092), (-14.45, -13.95))
            ThreePointArc((-14.45, -13.95), (-17.5121771092, -12.2553673588), (-17.3217797887, -15.75))
        make_face()
        with Locations((-16.45, -13.95)):
            Circle(F44_R, mode=Mode.SUBTRACT)
        with BuildLine():
            Line((-17.3217797887, 15.75), (-15.5782202113, 15.75))
            ThreePointArc((-15.5782202113, 15.75), (-16.45, 15.95), (-17.3217797887, 15.75))
        make_face()
        with BuildLine():
            ThreePointArc((-14.45, 13.95), (-14.7553673588, 15.0121771092), (-15.5782202113, 15.75))
            Line((-15.5782202113, 15.75), (-17.3217797887, 15.75))
            ThreePointArc((-17.3217797887, 15.75), (-17.5121771092, 12.2553673588), (-14.45, 13.95))
        make_face()
        with Locations((-16.45, 13.95)):
            Circle(F44_R, mode=Mode.SUBTRACT)
    extrude(amount=-F45_DEPTH, mode=Mode.SUBTRACT)

    # F46 (on face) → F47 (join)
    with BuildSketch(Plane.XY.offset(1.05)):
        with Locations((0, -12.7)):
            Rectangle(F46_W, F46_H)
    extrude(amount=F47_DEPTH)


solid = Compound([f1.part, f28.part])
